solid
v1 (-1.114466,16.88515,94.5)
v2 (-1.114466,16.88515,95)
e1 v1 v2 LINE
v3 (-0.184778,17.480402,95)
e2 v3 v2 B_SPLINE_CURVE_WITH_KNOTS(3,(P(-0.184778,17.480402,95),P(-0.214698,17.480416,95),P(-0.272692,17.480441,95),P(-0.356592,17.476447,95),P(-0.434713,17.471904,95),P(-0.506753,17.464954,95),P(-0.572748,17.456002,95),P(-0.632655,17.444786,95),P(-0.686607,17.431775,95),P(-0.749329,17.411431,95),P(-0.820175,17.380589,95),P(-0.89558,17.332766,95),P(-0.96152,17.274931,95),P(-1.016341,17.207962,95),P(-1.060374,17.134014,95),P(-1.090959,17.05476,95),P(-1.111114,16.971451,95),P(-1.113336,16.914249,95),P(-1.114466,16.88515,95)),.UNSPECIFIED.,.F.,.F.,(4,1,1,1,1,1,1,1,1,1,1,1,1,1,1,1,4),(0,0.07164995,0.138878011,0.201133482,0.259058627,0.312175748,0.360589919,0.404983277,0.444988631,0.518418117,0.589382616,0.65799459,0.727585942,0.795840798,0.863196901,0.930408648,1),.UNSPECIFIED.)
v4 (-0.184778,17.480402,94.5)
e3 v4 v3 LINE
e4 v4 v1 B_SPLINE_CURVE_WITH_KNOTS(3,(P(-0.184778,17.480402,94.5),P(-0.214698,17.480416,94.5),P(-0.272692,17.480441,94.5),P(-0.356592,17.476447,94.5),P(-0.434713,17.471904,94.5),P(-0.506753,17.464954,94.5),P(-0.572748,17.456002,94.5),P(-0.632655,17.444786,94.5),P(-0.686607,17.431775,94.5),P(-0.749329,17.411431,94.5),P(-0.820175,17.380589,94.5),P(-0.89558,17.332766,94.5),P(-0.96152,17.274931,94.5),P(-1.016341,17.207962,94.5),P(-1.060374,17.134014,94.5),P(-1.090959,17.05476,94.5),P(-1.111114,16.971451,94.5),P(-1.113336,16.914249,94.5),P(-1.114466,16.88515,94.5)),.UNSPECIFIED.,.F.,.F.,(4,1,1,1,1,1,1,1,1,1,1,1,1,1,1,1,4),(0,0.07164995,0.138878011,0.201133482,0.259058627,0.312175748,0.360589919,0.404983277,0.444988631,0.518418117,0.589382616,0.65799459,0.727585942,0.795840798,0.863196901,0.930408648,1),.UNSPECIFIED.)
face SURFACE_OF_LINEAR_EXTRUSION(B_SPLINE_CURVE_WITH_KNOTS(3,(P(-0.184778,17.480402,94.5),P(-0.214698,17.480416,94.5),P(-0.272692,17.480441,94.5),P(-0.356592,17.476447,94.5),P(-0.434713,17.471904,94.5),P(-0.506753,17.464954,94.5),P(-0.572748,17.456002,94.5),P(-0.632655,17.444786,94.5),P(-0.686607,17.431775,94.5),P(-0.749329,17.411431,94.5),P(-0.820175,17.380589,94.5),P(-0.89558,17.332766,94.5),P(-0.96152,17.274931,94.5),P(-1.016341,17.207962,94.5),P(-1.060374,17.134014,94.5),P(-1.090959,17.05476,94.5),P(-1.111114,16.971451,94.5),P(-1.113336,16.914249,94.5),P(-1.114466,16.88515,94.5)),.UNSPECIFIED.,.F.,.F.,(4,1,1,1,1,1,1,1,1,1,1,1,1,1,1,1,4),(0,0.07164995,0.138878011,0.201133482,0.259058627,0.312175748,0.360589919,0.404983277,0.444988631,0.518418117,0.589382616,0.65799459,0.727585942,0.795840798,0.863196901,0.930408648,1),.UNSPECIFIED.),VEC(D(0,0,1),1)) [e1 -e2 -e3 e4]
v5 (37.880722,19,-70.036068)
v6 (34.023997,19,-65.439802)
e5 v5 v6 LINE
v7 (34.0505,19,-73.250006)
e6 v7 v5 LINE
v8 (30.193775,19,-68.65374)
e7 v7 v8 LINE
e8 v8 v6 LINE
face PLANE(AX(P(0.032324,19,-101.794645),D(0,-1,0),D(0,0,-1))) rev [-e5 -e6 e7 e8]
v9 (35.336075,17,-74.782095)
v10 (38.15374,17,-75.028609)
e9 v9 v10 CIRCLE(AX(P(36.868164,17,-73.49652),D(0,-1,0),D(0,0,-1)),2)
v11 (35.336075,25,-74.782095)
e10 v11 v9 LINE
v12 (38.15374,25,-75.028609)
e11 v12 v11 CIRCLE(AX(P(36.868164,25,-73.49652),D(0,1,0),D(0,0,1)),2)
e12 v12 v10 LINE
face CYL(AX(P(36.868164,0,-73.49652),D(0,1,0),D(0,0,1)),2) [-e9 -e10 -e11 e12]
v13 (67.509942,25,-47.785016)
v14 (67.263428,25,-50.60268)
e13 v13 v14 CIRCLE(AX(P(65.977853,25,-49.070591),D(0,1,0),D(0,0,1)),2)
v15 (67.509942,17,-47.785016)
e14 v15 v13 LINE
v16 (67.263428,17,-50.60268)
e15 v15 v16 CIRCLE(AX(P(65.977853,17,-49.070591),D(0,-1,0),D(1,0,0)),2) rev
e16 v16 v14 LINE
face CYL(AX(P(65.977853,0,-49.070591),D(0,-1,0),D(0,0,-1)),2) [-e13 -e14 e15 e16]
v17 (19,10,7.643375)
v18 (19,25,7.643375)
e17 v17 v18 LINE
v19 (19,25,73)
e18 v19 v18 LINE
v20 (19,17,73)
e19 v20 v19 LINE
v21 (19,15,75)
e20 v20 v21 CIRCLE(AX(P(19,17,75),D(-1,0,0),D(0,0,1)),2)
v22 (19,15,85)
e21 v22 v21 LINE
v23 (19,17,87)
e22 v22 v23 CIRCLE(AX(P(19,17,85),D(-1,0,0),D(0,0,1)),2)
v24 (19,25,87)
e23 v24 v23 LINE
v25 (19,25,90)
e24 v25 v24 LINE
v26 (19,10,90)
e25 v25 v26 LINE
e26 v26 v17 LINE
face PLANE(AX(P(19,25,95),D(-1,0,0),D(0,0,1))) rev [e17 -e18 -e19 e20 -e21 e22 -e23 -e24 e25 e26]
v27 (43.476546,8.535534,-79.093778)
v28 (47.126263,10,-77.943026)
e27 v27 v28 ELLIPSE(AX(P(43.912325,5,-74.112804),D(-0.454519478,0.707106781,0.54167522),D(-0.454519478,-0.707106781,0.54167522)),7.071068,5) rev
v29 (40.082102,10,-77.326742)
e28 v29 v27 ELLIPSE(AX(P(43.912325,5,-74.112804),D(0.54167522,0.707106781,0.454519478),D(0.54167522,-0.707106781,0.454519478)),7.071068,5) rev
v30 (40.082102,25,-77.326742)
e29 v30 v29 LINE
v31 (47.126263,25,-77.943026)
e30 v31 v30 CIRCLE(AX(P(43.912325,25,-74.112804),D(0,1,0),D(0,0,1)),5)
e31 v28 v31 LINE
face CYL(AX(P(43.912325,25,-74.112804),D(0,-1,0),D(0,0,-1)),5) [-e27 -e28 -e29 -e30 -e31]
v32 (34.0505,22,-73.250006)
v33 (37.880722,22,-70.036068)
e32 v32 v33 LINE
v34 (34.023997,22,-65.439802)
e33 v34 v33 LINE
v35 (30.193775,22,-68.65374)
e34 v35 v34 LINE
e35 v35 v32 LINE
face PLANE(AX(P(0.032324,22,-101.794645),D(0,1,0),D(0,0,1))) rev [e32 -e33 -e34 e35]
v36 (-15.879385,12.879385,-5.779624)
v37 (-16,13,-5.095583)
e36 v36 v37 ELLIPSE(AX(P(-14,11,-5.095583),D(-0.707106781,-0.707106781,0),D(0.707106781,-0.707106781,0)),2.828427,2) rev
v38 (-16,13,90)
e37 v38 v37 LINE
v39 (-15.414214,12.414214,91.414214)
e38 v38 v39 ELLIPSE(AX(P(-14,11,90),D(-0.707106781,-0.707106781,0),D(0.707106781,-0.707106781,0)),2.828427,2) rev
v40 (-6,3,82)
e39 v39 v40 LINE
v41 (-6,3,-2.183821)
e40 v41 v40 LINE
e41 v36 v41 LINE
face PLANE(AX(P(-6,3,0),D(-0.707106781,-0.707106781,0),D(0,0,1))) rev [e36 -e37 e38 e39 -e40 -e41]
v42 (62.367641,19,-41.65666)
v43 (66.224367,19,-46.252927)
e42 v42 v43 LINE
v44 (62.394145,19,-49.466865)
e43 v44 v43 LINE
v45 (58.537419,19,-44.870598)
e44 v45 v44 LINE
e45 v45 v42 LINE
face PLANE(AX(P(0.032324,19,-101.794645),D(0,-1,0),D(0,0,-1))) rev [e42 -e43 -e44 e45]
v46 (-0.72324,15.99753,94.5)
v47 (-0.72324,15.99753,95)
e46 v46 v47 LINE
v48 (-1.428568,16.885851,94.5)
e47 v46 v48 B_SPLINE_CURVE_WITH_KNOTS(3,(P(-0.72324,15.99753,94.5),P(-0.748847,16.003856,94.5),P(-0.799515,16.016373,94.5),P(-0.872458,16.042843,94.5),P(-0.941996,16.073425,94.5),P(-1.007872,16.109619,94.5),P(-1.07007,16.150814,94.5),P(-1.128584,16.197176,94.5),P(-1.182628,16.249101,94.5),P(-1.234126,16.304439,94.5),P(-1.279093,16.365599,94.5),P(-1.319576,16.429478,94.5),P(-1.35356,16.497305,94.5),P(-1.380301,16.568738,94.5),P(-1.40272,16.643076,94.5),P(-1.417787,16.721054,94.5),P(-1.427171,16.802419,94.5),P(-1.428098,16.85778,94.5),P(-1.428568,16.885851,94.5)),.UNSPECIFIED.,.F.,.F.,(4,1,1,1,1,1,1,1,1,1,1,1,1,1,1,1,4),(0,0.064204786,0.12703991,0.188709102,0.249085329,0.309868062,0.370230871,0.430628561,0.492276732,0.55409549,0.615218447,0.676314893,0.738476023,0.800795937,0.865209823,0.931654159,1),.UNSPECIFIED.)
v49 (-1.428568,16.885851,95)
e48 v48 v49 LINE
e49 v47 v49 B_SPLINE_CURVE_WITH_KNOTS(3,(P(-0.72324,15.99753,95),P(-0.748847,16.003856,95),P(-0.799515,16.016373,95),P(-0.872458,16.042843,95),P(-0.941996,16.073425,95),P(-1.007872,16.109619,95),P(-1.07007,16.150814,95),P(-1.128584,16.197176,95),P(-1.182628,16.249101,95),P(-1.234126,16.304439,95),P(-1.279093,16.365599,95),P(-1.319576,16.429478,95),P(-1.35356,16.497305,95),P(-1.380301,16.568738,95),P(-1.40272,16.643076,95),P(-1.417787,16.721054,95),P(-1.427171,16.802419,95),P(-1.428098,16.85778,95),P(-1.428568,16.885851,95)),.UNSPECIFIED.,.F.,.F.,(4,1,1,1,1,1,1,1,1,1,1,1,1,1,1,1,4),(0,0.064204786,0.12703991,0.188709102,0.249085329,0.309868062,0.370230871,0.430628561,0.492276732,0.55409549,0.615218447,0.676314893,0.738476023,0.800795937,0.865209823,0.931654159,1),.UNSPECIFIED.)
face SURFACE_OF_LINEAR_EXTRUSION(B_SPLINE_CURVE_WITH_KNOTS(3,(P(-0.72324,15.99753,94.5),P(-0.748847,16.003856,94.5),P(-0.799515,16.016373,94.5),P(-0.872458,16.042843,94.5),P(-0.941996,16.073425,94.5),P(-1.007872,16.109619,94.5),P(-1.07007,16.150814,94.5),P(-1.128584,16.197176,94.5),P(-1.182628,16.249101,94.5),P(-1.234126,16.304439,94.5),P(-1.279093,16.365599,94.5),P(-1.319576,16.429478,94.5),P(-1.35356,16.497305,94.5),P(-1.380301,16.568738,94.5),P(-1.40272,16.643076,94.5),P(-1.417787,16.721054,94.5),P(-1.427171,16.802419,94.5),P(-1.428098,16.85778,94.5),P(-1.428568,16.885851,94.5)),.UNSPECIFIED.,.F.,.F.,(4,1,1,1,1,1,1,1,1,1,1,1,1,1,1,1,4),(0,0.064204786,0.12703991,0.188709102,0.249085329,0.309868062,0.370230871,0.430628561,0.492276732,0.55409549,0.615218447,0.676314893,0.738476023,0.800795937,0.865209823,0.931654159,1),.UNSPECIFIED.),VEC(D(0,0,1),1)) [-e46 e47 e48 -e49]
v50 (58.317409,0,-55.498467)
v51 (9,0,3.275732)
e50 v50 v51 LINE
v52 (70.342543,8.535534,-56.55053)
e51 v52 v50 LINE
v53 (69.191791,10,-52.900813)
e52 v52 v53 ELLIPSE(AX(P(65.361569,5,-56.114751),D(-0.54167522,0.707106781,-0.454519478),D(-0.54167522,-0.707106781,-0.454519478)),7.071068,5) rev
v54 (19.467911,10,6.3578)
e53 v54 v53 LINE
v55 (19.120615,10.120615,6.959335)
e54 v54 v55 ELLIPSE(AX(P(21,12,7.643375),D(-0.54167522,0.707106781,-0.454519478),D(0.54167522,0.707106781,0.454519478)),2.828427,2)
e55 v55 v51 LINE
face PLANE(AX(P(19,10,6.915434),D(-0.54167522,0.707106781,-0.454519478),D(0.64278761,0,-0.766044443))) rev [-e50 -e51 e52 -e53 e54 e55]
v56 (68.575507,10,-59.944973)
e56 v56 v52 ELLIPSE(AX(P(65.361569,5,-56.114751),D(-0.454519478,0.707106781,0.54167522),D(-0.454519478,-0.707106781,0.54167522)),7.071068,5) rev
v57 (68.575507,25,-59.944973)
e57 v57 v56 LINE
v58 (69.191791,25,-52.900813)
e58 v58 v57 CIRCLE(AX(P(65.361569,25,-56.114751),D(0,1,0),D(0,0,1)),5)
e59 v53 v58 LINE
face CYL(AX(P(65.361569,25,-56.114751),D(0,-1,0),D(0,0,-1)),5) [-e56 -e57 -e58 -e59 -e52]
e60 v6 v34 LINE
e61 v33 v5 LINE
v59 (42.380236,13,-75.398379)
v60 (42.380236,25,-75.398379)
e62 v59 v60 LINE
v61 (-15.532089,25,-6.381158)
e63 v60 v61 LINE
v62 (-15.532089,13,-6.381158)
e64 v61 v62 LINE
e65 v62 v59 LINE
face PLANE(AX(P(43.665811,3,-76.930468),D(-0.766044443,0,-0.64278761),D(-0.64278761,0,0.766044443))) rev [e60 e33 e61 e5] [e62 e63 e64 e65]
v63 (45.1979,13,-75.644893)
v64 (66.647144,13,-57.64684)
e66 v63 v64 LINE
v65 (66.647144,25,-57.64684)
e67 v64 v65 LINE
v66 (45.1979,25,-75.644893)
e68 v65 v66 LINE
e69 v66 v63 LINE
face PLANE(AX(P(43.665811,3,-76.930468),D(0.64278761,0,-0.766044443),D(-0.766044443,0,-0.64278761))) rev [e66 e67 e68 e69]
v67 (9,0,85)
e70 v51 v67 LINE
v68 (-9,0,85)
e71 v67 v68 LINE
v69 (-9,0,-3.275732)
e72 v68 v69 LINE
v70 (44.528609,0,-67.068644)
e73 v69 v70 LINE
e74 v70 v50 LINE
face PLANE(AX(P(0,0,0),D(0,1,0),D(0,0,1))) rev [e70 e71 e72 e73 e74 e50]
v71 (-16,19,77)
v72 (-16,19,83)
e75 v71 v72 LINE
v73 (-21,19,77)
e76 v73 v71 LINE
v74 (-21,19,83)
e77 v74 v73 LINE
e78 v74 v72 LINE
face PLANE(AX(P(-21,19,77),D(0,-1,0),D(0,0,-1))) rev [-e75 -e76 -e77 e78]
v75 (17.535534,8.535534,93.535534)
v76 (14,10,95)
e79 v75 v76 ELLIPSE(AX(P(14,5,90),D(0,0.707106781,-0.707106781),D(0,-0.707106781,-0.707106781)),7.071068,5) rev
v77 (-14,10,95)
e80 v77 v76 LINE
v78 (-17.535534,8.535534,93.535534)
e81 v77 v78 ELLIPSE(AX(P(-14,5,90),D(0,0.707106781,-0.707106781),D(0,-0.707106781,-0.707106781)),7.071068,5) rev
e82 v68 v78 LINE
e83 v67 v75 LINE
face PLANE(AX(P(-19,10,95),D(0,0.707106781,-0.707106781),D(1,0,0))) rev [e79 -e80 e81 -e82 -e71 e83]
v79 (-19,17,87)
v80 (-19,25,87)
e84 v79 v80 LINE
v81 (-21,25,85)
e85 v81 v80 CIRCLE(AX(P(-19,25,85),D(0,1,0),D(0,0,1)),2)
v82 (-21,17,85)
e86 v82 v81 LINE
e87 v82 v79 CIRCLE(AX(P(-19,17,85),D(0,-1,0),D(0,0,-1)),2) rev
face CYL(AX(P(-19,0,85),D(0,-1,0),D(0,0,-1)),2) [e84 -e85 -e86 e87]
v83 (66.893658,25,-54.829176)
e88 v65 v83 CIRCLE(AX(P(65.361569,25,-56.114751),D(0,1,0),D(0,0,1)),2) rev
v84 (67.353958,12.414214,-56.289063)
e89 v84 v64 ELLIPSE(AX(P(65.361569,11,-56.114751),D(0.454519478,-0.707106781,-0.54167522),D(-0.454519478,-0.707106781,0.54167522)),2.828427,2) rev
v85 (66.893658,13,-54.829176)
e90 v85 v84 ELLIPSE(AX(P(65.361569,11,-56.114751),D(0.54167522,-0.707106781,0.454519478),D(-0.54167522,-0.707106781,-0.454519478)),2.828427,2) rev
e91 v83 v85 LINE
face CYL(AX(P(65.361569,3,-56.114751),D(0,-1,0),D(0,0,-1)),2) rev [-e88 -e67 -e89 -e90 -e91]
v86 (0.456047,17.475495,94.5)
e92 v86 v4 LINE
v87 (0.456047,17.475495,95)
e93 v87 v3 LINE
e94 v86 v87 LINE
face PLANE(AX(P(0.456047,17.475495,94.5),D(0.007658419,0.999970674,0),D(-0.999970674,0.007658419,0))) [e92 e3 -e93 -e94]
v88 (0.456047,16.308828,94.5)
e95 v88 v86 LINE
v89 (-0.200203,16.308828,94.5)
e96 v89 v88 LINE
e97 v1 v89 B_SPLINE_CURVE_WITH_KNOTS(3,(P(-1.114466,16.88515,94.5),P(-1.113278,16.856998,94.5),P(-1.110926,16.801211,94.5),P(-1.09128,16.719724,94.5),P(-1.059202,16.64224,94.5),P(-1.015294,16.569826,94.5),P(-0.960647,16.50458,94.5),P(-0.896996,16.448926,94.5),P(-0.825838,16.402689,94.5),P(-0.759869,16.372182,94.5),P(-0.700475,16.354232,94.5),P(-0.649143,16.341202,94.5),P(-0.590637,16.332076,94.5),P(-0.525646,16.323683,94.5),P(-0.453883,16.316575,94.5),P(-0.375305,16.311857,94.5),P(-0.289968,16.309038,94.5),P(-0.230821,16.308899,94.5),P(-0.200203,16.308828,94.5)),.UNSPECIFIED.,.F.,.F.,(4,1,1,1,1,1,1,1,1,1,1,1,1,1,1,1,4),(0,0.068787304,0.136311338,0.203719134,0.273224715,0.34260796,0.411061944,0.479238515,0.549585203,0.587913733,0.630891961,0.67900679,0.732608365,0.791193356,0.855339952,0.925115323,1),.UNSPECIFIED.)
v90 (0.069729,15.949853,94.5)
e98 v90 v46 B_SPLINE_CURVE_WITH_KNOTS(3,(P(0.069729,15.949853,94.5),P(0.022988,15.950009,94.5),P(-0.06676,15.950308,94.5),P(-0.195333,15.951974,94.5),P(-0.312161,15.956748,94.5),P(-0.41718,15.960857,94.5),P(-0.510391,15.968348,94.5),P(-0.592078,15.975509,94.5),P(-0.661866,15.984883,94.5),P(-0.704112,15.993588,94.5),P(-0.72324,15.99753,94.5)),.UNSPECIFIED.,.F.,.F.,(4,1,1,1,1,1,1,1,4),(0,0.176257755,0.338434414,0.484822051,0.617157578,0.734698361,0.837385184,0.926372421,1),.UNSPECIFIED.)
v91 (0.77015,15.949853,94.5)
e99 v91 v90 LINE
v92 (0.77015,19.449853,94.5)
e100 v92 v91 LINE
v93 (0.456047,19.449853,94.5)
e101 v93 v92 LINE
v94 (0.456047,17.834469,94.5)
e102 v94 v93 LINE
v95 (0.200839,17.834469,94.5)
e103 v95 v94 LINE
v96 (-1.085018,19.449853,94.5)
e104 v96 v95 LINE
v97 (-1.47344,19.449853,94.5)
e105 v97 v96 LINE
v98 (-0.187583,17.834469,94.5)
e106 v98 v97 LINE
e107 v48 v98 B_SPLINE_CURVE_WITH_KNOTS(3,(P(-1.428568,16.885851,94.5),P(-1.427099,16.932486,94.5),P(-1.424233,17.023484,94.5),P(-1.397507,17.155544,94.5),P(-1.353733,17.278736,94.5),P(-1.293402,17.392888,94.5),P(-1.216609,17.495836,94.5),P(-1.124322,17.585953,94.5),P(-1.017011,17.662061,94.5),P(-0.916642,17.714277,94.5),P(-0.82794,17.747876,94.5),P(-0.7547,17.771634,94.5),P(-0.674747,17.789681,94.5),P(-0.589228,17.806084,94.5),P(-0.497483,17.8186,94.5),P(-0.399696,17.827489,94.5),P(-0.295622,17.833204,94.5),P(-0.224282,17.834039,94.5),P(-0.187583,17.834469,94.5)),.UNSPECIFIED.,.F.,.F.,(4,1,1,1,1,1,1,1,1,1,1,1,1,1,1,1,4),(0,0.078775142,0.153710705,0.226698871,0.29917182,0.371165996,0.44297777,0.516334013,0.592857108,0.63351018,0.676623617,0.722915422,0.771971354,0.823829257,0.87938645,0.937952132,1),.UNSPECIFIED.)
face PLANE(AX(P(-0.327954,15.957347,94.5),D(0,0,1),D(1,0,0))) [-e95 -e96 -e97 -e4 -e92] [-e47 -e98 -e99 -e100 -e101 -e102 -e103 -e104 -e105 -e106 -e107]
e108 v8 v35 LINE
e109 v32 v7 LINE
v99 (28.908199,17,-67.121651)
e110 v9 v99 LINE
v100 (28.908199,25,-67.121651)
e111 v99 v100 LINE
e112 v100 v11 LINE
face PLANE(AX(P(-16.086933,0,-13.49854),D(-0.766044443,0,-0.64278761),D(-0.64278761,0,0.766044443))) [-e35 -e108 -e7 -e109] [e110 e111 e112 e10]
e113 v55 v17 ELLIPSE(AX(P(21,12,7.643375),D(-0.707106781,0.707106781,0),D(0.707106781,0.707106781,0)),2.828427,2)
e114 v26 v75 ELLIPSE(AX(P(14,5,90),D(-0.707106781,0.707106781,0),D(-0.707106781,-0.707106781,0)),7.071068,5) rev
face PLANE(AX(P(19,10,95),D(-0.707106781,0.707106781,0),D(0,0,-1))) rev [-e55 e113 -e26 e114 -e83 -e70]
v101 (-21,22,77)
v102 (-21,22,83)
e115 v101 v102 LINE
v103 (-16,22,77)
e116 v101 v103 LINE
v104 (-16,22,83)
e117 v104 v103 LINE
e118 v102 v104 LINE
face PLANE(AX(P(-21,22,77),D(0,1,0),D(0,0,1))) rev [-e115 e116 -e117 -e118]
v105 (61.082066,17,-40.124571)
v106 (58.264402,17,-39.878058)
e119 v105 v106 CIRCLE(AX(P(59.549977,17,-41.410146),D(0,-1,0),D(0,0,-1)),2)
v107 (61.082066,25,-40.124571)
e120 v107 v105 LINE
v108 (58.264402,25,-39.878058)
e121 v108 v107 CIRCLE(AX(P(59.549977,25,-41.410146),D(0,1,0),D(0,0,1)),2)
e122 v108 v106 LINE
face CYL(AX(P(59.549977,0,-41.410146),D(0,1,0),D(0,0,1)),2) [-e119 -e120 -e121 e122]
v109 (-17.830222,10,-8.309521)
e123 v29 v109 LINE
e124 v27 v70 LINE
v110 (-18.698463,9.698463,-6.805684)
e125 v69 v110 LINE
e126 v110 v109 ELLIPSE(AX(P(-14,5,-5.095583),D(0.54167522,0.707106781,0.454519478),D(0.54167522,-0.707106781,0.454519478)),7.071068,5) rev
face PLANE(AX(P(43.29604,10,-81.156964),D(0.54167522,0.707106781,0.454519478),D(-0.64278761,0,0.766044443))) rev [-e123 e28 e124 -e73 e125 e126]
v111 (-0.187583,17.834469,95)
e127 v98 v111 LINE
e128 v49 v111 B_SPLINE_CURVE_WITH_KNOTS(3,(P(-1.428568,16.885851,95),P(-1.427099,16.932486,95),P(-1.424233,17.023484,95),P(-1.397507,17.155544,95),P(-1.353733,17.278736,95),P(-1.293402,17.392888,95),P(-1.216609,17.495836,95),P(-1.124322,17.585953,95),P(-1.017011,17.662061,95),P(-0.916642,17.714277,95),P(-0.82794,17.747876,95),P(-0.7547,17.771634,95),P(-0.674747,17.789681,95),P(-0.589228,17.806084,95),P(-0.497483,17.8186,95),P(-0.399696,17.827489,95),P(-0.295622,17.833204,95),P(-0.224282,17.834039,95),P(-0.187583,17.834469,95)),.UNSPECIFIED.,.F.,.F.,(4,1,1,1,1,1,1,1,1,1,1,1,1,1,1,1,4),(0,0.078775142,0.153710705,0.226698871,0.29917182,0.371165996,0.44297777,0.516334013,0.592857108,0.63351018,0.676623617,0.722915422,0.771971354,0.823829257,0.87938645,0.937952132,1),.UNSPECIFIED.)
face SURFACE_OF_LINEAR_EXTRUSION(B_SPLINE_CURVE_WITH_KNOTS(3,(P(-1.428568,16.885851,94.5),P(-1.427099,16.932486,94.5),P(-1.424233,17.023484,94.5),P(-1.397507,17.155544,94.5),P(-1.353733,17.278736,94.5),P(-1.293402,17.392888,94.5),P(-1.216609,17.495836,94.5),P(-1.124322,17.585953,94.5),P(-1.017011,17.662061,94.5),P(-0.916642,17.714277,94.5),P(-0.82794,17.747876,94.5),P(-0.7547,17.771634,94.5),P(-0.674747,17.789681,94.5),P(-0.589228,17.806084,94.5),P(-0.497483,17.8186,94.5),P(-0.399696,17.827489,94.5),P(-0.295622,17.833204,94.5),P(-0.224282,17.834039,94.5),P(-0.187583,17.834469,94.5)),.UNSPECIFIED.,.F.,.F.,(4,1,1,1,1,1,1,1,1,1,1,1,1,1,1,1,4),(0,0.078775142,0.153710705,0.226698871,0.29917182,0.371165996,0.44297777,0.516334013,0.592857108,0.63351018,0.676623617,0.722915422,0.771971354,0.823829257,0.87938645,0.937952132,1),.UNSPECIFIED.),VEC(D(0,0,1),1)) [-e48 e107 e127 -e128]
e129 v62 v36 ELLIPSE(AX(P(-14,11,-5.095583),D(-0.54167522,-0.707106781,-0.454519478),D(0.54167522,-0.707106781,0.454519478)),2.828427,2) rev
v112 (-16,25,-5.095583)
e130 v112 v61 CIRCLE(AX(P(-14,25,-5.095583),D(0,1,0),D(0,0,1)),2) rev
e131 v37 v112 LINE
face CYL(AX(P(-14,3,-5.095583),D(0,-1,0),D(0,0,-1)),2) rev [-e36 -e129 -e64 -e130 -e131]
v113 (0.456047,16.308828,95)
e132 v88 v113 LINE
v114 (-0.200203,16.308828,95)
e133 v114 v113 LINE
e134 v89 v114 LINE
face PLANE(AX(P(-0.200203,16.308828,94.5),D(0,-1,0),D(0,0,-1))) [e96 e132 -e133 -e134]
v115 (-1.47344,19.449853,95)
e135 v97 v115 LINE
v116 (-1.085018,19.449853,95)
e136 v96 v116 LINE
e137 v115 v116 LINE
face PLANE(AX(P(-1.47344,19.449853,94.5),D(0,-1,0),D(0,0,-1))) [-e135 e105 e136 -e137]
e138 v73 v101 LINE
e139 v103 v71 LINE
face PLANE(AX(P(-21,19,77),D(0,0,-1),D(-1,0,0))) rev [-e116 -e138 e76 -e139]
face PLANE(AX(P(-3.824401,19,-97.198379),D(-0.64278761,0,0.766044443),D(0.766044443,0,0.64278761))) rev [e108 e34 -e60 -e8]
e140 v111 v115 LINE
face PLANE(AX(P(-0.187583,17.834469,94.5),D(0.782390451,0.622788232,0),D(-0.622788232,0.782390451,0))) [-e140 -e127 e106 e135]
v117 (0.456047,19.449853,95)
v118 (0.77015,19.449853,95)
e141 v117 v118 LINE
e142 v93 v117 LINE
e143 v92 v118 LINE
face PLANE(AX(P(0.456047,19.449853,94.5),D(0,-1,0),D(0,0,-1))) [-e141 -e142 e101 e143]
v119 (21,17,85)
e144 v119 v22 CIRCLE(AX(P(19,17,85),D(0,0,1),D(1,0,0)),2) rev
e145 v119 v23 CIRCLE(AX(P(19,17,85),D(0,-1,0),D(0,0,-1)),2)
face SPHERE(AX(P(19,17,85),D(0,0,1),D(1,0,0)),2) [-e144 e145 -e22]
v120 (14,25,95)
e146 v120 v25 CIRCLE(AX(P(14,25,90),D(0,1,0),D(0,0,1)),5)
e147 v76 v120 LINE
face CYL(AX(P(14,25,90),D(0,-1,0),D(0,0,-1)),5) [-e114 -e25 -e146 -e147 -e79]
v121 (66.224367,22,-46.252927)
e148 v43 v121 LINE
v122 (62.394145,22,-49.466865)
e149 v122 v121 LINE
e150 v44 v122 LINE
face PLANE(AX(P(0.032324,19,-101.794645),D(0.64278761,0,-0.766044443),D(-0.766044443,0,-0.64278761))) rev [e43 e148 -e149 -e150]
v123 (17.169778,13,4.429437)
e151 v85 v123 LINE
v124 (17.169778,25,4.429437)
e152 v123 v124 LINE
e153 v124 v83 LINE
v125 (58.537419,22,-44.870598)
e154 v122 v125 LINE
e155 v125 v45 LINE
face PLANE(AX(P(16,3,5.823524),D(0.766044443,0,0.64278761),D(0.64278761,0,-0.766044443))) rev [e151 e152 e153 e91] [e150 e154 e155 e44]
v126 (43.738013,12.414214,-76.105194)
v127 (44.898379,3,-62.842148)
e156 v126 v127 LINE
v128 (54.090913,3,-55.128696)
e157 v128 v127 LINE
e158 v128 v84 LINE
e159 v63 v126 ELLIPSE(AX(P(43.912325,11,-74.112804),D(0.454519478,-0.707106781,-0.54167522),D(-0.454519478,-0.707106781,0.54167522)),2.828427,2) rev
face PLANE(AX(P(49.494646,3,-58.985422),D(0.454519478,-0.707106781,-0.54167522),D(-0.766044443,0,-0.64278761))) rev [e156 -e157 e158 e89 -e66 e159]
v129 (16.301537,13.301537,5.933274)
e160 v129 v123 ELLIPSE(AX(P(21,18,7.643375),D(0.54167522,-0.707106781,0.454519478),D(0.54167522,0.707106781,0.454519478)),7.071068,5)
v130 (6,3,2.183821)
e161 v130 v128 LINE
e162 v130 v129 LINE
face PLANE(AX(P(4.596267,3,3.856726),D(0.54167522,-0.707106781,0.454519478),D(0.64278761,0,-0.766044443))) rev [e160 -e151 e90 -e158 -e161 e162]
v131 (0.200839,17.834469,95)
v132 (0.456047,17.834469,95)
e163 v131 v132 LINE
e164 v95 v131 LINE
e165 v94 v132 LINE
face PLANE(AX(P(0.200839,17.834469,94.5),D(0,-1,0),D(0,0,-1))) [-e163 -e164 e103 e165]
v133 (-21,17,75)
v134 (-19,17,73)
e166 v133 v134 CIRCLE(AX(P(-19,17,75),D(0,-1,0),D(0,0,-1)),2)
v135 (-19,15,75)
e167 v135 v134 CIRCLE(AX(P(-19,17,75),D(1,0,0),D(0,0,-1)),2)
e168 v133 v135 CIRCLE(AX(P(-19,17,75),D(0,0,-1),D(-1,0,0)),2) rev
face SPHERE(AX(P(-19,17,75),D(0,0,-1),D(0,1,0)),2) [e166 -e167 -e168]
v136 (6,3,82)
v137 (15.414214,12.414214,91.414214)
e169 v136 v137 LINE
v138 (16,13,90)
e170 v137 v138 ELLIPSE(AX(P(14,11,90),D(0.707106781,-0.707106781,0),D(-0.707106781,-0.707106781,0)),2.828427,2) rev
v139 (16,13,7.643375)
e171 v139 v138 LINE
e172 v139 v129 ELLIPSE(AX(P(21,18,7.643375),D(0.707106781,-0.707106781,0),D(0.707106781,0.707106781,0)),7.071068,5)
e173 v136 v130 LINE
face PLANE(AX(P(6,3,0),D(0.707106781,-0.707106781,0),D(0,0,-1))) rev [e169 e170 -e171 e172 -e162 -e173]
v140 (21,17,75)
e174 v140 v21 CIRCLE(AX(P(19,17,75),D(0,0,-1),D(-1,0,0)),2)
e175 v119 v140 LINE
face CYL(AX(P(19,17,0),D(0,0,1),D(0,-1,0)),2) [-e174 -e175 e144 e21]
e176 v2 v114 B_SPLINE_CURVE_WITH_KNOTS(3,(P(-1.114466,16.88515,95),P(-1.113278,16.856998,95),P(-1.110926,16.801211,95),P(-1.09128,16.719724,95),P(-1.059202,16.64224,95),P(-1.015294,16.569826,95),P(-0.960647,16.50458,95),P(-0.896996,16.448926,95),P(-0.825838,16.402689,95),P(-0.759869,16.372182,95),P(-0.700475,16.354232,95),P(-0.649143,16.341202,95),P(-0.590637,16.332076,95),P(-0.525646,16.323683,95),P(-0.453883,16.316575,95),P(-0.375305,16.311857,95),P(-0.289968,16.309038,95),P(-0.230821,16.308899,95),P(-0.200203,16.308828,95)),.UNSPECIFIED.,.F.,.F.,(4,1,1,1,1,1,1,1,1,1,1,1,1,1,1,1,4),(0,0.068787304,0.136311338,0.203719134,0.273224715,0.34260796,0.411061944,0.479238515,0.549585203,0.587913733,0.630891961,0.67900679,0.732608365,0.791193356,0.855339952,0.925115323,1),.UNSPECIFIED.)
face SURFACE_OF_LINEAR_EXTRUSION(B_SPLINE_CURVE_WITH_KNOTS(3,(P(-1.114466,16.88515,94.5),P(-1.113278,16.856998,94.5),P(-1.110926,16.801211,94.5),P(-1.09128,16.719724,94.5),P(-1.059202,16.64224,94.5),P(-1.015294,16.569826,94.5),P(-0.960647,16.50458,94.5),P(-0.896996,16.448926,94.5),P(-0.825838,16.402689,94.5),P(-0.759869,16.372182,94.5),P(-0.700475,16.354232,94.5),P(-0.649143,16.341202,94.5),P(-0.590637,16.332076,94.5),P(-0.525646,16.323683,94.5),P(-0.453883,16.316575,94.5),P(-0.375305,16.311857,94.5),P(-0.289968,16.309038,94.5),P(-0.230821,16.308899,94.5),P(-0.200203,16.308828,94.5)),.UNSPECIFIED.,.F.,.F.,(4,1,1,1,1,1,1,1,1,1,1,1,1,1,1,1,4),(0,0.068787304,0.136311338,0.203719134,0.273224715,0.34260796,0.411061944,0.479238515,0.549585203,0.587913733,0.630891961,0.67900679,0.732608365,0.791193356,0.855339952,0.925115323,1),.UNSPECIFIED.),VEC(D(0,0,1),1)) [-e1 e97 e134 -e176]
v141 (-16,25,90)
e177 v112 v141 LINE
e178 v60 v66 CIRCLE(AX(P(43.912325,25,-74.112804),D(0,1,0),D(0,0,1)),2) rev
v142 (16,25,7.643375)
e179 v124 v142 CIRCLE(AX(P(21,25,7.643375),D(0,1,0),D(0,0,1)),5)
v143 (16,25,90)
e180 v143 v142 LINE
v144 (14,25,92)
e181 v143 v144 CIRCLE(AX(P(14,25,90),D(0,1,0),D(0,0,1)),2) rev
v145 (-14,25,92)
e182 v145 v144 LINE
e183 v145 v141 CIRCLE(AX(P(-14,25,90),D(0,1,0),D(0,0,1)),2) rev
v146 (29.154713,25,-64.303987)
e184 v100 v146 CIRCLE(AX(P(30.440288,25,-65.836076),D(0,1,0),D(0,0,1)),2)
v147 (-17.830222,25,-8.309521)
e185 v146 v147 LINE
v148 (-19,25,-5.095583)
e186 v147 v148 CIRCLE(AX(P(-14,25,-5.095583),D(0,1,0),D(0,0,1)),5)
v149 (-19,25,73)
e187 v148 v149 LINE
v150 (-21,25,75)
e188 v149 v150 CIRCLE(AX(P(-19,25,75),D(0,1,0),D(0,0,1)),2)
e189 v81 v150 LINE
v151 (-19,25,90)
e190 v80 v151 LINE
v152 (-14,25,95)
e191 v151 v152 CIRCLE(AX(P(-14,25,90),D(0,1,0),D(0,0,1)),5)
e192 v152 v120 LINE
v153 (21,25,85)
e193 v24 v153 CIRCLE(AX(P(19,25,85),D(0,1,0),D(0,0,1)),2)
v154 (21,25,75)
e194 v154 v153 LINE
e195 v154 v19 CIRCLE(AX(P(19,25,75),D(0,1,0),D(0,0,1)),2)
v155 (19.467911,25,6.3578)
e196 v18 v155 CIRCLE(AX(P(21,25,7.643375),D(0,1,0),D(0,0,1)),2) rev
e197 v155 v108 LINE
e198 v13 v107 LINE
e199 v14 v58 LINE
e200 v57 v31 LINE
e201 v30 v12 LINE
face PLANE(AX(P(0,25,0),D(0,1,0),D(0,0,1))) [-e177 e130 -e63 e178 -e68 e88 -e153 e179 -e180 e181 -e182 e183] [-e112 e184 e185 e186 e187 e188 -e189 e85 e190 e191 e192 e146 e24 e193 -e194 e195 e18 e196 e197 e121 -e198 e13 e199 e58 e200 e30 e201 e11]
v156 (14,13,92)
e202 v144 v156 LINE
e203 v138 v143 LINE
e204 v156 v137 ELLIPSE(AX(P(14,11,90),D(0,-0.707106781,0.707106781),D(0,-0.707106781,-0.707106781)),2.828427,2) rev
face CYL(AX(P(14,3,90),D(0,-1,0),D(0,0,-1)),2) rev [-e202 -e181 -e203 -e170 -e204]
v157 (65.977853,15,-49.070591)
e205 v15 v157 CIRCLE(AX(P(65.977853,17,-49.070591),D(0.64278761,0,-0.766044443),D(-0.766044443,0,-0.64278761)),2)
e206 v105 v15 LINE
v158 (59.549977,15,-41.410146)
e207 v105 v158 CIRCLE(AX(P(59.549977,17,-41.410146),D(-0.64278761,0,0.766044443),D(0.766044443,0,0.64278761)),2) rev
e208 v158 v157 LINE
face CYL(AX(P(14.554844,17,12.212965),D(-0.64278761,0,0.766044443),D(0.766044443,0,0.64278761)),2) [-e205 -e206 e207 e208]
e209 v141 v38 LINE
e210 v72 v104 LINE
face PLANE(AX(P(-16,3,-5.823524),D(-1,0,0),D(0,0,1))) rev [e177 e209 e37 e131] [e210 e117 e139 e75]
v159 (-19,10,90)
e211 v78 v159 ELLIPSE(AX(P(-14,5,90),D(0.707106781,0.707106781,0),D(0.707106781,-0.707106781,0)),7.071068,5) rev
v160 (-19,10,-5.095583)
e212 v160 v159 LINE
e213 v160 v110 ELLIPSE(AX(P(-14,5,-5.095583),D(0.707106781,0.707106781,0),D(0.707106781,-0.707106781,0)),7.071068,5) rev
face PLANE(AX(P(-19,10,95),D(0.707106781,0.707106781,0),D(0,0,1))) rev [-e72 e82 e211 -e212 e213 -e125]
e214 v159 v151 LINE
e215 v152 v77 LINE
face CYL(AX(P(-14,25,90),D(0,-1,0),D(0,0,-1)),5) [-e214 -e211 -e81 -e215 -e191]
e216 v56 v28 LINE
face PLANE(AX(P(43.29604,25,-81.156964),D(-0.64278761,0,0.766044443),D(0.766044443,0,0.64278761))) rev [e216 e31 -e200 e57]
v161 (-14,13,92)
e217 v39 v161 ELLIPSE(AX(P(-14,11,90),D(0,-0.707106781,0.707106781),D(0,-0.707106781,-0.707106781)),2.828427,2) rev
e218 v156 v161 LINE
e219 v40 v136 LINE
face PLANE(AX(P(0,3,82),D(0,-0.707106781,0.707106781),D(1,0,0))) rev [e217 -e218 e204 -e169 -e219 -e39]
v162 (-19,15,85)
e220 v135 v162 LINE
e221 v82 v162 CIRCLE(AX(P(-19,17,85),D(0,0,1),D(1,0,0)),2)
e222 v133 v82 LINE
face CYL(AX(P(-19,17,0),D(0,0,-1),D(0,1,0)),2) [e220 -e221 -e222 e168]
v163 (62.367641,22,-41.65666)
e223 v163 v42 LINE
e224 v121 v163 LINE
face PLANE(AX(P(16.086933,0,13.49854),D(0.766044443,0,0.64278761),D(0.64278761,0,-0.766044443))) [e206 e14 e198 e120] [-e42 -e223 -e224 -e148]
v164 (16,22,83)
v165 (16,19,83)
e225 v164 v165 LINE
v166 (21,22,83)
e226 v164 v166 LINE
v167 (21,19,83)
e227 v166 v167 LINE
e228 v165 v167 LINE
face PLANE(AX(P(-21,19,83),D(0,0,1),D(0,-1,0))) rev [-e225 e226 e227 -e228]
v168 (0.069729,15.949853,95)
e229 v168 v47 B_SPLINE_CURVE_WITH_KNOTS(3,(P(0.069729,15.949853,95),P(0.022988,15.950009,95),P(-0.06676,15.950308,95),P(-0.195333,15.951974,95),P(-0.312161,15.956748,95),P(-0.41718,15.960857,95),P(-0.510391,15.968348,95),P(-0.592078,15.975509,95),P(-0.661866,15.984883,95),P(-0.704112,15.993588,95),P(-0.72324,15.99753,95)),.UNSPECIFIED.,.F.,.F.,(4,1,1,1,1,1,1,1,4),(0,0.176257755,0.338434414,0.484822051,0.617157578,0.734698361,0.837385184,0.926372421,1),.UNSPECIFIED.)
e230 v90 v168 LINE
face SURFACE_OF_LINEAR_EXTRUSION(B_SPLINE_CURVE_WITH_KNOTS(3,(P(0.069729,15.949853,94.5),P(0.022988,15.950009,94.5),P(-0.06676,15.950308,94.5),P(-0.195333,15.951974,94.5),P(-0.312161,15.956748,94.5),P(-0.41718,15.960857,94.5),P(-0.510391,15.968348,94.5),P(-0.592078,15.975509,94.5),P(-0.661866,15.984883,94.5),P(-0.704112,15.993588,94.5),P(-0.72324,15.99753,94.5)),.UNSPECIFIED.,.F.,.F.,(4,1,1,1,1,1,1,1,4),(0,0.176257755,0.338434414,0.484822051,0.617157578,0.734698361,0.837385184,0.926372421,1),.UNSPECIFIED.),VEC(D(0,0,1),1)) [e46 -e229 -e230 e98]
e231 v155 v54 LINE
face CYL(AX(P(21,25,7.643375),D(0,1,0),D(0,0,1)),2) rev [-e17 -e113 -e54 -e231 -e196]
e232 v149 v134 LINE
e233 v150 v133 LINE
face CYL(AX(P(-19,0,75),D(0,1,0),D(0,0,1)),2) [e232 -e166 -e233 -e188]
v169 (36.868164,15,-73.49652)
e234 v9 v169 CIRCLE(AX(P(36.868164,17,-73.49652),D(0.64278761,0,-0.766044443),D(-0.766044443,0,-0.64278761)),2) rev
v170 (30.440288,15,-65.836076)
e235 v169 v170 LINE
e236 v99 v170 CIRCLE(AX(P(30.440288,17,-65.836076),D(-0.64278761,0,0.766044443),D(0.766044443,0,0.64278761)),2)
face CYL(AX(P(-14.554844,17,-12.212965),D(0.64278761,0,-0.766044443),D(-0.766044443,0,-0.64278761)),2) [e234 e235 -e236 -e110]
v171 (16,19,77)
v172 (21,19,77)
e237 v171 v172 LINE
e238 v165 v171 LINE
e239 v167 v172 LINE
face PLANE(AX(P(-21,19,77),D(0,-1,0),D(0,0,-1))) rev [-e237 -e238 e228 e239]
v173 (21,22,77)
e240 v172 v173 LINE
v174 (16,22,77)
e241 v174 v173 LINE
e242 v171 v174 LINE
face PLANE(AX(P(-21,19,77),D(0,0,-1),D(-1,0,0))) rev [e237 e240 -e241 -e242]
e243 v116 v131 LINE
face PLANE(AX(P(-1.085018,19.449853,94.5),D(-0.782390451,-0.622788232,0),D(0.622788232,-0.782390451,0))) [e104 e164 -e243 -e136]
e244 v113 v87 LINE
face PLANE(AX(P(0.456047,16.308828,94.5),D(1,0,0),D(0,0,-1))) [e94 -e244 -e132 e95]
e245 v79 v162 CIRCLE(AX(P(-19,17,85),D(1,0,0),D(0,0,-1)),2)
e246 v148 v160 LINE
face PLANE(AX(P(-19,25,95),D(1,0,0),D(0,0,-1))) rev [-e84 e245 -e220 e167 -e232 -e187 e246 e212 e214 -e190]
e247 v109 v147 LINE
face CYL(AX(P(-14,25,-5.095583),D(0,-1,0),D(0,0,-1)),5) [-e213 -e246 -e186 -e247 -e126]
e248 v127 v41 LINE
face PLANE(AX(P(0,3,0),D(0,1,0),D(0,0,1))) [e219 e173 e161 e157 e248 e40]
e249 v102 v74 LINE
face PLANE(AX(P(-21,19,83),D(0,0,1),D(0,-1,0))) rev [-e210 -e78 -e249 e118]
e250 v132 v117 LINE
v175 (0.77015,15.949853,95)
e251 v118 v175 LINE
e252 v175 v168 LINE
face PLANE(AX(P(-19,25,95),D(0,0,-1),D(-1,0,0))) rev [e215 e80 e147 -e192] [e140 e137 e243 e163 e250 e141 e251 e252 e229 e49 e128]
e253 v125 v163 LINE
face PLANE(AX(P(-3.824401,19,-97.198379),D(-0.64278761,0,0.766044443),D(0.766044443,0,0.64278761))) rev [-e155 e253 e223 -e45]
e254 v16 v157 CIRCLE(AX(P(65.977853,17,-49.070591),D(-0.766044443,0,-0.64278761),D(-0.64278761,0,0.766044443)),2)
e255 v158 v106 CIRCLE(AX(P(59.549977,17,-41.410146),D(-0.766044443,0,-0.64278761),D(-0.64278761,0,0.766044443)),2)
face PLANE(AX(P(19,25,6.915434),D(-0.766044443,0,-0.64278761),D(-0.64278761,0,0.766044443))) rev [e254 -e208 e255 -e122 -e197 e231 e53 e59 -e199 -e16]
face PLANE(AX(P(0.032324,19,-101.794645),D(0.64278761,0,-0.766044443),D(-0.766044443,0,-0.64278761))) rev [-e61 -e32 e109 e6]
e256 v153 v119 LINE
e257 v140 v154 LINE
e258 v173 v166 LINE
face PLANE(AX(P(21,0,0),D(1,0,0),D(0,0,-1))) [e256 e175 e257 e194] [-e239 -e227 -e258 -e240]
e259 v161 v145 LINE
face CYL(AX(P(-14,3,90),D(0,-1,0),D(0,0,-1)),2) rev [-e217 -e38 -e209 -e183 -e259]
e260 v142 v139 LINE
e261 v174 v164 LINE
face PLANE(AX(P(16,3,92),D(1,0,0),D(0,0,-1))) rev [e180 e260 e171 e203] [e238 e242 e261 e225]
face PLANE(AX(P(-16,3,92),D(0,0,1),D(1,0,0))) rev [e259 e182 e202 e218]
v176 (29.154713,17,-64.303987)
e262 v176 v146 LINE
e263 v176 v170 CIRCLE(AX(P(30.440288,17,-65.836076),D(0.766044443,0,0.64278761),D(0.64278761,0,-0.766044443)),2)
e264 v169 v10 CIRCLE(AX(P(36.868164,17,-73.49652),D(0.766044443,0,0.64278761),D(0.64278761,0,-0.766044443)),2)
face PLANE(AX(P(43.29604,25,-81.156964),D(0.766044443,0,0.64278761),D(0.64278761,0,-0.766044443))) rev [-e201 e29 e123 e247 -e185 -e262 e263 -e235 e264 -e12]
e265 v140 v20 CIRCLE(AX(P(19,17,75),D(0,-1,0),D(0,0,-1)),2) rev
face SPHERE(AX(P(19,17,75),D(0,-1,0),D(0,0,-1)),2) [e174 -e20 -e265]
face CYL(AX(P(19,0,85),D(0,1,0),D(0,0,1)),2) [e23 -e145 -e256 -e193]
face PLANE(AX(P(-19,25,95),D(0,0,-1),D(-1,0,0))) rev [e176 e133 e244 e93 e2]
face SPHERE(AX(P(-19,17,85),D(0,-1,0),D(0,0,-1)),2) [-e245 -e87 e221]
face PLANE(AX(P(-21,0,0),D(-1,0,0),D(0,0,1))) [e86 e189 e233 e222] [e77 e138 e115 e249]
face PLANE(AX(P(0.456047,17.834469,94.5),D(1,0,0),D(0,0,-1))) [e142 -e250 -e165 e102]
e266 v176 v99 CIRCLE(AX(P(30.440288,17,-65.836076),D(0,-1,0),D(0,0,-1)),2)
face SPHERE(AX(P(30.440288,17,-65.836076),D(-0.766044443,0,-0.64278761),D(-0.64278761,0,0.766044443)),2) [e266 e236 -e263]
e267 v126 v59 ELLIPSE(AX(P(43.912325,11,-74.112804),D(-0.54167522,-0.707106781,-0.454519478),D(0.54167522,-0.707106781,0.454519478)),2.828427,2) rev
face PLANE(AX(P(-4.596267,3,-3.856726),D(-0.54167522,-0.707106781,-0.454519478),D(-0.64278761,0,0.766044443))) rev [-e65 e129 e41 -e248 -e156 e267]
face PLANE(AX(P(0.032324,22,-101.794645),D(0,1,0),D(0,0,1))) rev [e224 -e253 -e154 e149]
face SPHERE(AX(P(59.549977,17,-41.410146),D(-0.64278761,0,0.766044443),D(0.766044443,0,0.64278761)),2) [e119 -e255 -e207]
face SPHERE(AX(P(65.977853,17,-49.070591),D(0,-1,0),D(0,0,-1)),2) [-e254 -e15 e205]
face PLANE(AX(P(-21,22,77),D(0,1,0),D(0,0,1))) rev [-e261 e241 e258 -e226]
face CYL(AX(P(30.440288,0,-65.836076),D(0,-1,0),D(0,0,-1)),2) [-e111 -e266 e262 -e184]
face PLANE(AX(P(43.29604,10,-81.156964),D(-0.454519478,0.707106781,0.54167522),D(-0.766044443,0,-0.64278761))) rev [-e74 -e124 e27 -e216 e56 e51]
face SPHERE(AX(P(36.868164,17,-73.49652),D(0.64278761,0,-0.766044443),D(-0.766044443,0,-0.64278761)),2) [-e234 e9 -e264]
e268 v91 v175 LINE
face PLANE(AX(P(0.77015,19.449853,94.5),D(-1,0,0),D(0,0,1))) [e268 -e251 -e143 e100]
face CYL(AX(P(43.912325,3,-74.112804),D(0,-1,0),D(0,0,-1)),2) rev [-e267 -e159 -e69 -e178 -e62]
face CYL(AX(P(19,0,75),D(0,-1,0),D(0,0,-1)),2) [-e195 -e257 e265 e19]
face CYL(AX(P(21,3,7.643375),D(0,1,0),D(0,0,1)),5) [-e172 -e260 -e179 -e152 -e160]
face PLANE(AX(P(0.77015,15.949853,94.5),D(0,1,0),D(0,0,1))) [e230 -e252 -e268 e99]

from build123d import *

# Parameters (mm, degrees)
BOSS_EXTRUDE1_DEPTH     = 25
CUT_EXTRUDE1_DEPTH      = 22
CHAMFER1_SIZE           = 10
FILLET1_R               = 2
FILLET2_R               = 5
SKETCH3_W               = 14
SKETCH3_H               = 10
BOSS_EXTRUDE2_DEPTH     = 2
SKETCH4_W               = 14
SKETCH4_H               = 10
BOSS_EXTRUDE3_DEPTH     = 2
CUT_EXTRUDE2_DEPTH      = 111.216138206
CUT_EXTRUDE2_DEPTH_BACK = 111.216138206
SKETCH5_W               = 6
SKETCH5_H               = 3
SKETCH6_W               = 14
SKETCH6_H               = 10
BOSS_EXTRUDE4_DEPTH     = 2
SKETCH7_W               = 14
SKETCH7_H               = 10
BOSS_EXTRUDE5_DEPTH     = 2
CUT_EXTRUDE3_DEPTH      = 110.938912569
CUT_EXTRUDE3_DEPTH_BACK = 110.938912569
SKETCH8_W               = 6
SKETCH8_H               = 3
FILLET4_R               = 2
CUT_EXTRUDE4_DEPTH      = 0.5


with BuildPart() as part:
    # Sketch1 → Boss-Extrude1 (new body)
    with BuildSketch(Plane(origin=(0, 0, 0), x_dir=(1, 0, 0), z_dir=(0, 1, 0))):
        Polygon((19, -95), (19, -6.915434451), (72.405729291, 56.731035297), (43.296040453, 81.156964465), (-19, 6.915434451), (-19, -95), align=None)
    extrude(amount=BOSS_EXTRUDE1_DEPTH)

    # Sketch2 → Cut-Extrude1 (cut)
    with BuildSketch(Plane(origin=(0, 25, 0), x_dir=(1, 0, 0), z_dir=(0, 1, 0))):
        Polygon((43.665810953, 76.930468306), (68.179233133, 56.361264796), (16, -5.823523748), (16, -92), (-16, -92), (-16, 5.823523748), align=None)
    extrude(amount=-CUT_EXTRUDE1_DEPTH, mode=Mode.SUBTRACT)

    # Chamfer1
    chamfer1_edges = [part.edges().sort_by_distance(p)[0] for p in [
        (13.832905476, 3, -41.376996027),
        (55.922522043, 3, -66.645866551),
        (42.089616566, 3, -25.268870524),
        (16, 3, 48.911761874),
        (0, 3, 92),
        (-16, 3, 43.088238126),
        (-19, 0, 44.042282774),
        (12.148020226, 0, -44.036199458),
        (57.850884872, 0, -68.943999881),
        (45.702864646, 0, -24.907800423),
        (19, 0, 50.957717226),
        (0, 0, 95),
    ]]
    chamfer(chamfer1_edges, length=CHAMFER1_SIZE)

    # Fillet1
    fillet1_edges = [part.edges().sort_by_distance(p)[0] for p in [
        (19, 17.5, 6.915434451),
        (43.665810953, 19, -76.930468306),
        (68.179233133, 19, -56.361264796),
        (16, 19, 92),
        (-16, 19, 92),
        (-16, 19, -5.823523748),
    ]]
    fillet(fillet1_edges, radius=FILLET1_R)

    # Fillet2
    fillet2_edges = [part.edges().sort_by_distance(p)[0] for p in [
        (-19, 17.5, 95),
        (-19, 17.5, -6.915434451),
        (43.296040453, 17.5, -81.156964465),
        (72.405729291, 17.5, -56.731035297),
        (19, 17.5, 95),
        (16, 19, 5.823523748),
    ]]
    fillet(fillet2_edges, radius=FILLET2_R)

    # Sketch3 → Boss-Extrude2 (add)
    with BuildSketch(Plane(origin=(-14.554844419, 0, -12.212964584), x_dir=(-0.6427876096865406, 0, 0.7660444431189771), z_dir=(-0.766044443118977, 0, -0.6427876096865405))):
        with Locations((-75, 20)):
            Rectangle(SKETCH3_W, SKETCH3_H)
    extrude(amount=BOSS_EXTRUDE2_DEPTH)

    # Sketch4 → Boss-Extrude3 (add)
    with BuildSketch(Plane(origin=(14.554844419, 0, 12.212964584), x_dir=(0.6427876096865404, 0, -0.7660444431189771), z_dir=(0.7660444431189771, 0, 0.6427876096865404))):
        with Locations((75, 20)):
            Rectangle(SKETCH4_W, SKETCH4_H)
    extrude(amount=BOSS_EXTRUDE3_DEPTH)

    # Sketch5 → Cut-Extrude2 (cut, two sides: drawn at the far end of the back side and taken through both)
    with BuildSketch(Plane(origin=(16.086933305, 0, 13.498539803), x_dir=(0.64278760968654, 0, -0.7660444431189776), z_dir=(0.7660444431189775, 0, 0.6427876096865399)).offset(-CUT_EXTRUDE2_DEPTH_BACK)):
        with Locations((75, 20.5)):
            Rectangle(SKETCH5_W, SKETCH5_H)
    extrude(amount=CUT_EXTRUDE2_DEPTH + CUT_EXTRUDE2_DEPTH_BACK, mode=Mode.SUBTRACT)

    # Sketch6 → Boss-Extrude4 (add)
    with BuildSketch(Plane.ZY.offset(19)):
        with Locations((80, 20)):
            Rectangle(SKETCH6_W, SKETCH6_H)
    extrude(amount=BOSS_EXTRUDE4_DEPTH)

    # Sketch7 → Boss-Extrude5 (add)
    with BuildSketch(Plane(origin=(19, 0, 0), x_dir=(0, 0, -1), z_dir=(1, 0, 0))):
        with Locations((-80, 20)):
            Rectangle(SKETCH7_W, SKETCH7_H)
    extrude(amount=BOSS_EXTRUDE5_DEPTH)

    # Sketch8 → Cut-Extrude3 (cut, two sides: drawn at the far end of the back side and taken through both)
    with BuildSketch(Plane(origin=(21, 0, 0), x_dir=(0, 0, -1), z_dir=(1, 0, 0)).offset(-CUT_EXTRUDE3_DEPTH_BACK)):
        with Locations((-80, 20.5)):
            Rectangle(SKETCH8_W, SKETCH8_H)
    extrude(amount=CUT_EXTRUDE3_DEPTH + CUT_EXTRUDE3_DEPTH_BACK, mode=Mode.SUBTRACT)

    # Fillet4
    # the kernel refuses this fillet: 2 mm, written as the material it takes off along each edge
    with BuildSketch(Plane(origin=(36.868164356, 17, -73.496520034), x_dir=(-0.7660444431189771, 0, -0.6427876096865406), z_dir=(0.6427876096865406, 0, -0.7660444431189771))) as fillet4_piece_1_section:
        Polygon((0, 0), (FILLET4_R * 1.02, 0), (FILLET4_R * 1.02, -FILLET4_R * 1.02), (0, -FILLET4_R * 1.02), align=None)
    fillet4_piece_1 = extrude(amount=FILLET4_R * 1.02, mode=Mode.PRIVATE)
    fillet4_piece_1 = fillet4_piece_1 - Plane(origin=(36.868164356, 17, -73.496520034), x_dir=(0.5416752204197013, 0.7071067811865475, 0.4545194776720445), z_dir=(0.6427876096865406, 0, -0.7660444431189771)) * Sphere(FILLET4_R, mode=Mode.PRIVATE)
    add(fillet4_piece_1, mode=Mode.SUBTRACT)
    with BuildSketch(Plane(origin=(30.440288259, 17, -65.836075602), x_dir=(-0.7660444431189771, 0, -0.6427876096865406), z_dir=(0, -1, 0))) as fillet4_piece_2_section:
        Polygon((0, 0), (FILLET4_R * 1.02, 0), (FILLET4_R * 1.02, -FILLET4_R * 1.02), (0, -FILLET4_R * 1.02), align=None)
    fillet4_piece_2 = extrude(amount=FILLET4_R * 1.02, mode=Mode.PRIVATE)
    fillet4_piece_2 = fillet4_piece_2 - Plane(origin=(30.440288259, 17, -65.836075602), x_dir=(0.9961946980917457, -1.0048591735576166e-15, -0.08715574274765664), z_dir=(0, -1, 0)) * Sphere(FILLET4_R, mode=Mode.PRIVATE)
    add(fillet4_piece_2, mode=Mode.SUBTRACT)
    with BuildSketch(Plane(origin=(59.549977097, 17, -41.410146434), x_dir=(-0.6427876096865404, 0, 0.7660444431189771), z_dir=(0, -1, 0))) as fillet4_piece_3_section:
        Polygon((0, 0), (FILLET4_R * 1.02, 0), (FILLET4_R * 1.02, -FILLET4_R * 1.02), (0, -FILLET4_R * 1.02), align=None)
    fillet4_piece_3 = extrude(amount=FILLET4_R * 1.02, mode=Mode.PRIVATE)
    fillet4_piece_3 = fillet4_piece_3 - Plane(origin=(59.549977097, 17, -41.410146434), x_dir=(-0.08715574274765679, 0, -0.9961946980917457), z_dir=(0, -1, 0)) * Sphere(FILLET4_R, mode=Mode.PRIVATE)
    add(fillet4_piece_3, mode=Mode.SUBTRACT)
    with BuildSketch(Plane(origin=(65.977853194, 17, -49.070590865), x_dir=(0.7660444431189771, 0, 0.6427876096865404), z_dir=(0, -1, 0))) as fillet4_piece_4_section:
        Polygon((0, 0), (FILLET4_R * 1.02, 0), (FILLET4_R * 1.02, -FILLET4_R * 1.02), (0, -FILLET4_R * 1.02), align=None)
    fillet4_piece_4 = extrude(amount=FILLET4_R * 1.02, mode=Mode.PRIVATE)
    fillet4_piece_4 = fillet4_piece_4 - Plane(origin=(65.977853194, 17, -49.070590865), x_dir=(-0.9961946980917457, 0, 0.08715574274765679), z_dir=(0, -1, 0)) * Sphere(FILLET4_R, mode=Mode.PRIVATE)
    add(fillet4_piece_4, mode=Mode.SUBTRACT)
    with BuildSketch(Plane(origin=(-19, 17, 75), x_dir=(-1, 0, 0), z_dir=(0, 0, -1))) as fillet4_piece_5_section:
        Polygon((0, 0), (FILLET4_R * 1.02, 0), (FILLET4_R * 1.02, -FILLET4_R * 1.02), (0, -FILLET4_R * 1.02), align=None)
    fillet4_piece_5 = extrude(amount=FILLET4_R * 1.02, mode=Mode.PRIVATE)
    fillet4_piece_5 = fillet4_piece_5 - Plane(origin=(-19, 17, 75), x_dir=(0.7071067811865475, 0.7071067811865475, 0), z_dir=(0, 0, -1)) * Sphere(FILLET4_R, mode=Mode.PRIVATE)
    add(fillet4_piece_5, mode=Mode.SUBTRACT)
    with BuildSketch(Plane(origin=(-19, 17, 85), x_dir=(-1, 0, 0), z_dir=(0, -1, 0))) as fillet4_piece_6_section:
        Polygon((0, 0), (FILLET4_R * 1.02, 0), (FILLET4_R * 1.02, -FILLET4_R * 1.02), (0, -FILLET4_R * 1.02), align=None)
    fillet4_piece_6 = extrude(amount=FILLET4_R * 1.02, mode=Mode.PRIVATE)
    fillet4_piece_6 = fillet4_piece_6 - Plane(origin=(-19, 17, 85), x_dir=(0.7071067811865475, 0, -0.7071067811865475), z_dir=(0, -1, 0)) * Sphere(FILLET4_R, mode=Mode.PRIVATE)
    add(fillet4_piece_6, mode=Mode.SUBTRACT)
    with BuildSketch(Plane(origin=(19, 17, 85), x_dir=(0, -1, 0), z_dir=(1, 0, 0))) as fillet4_piece_7_section:
        Polygon((0, 0), (FILLET4_R * 1.02, 0), (FILLET4_R * 1.02, -FILLET4_R * 1.02), (0, -FILLET4_R * 1.02), align=None)
    fillet4_piece_7 = extrude(amount=FILLET4_R * 1.02, mode=Mode.PRIVATE)
    fillet4_piece_7 = fillet4_piece_7 - Plane(origin=(19, 17, 85), x_dir=(0, 0.7071067811865476, -0.7071067811865475), z_dir=(1, 0, 0)) * Sphere(FILLET4_R, mode=Mode.PRIVATE)
    add(fillet4_piece_7, mode=Mode.SUBTRACT)
    with BuildSketch(Plane(origin=(19, 17, 75), x_dir=(0, 0, -1), z_dir=(1, 0, 0))) as fillet4_piece_8_section:
        Polygon((0, 0), (FILLET4_R * 1.02, 0), (FILLET4_R * 1.02, -FILLET4_R * 1.02), (0, -FILLET4_R * 1.02), align=None)
    fillet4_piece_8 = extrude(amount=FILLET4_R * 1.02, mode=Mode.PRIVATE)
    fillet4_piece_8 = fillet4_piece_8 - Plane(origin=(19, 17, 75), x_dir=(0, 0.7071067811865475, 0.7071067811865477), z_dir=(1, 0, 0)) * Sphere(FILLET4_R, mode=Mode.PRIVATE)
    add(fillet4_piece_8, mode=Mode.SUBTRACT)
    with BuildSketch(Plane(origin=(36.621650689, 17, -76.314184139), x_dir=(0.7660444431189815, 0, 0.6427876096865355), z_dir=(0, 1, 0)), Plane(origin=(59.796490764, 17, -38.592482329), x_dir=(-0.7660444431189785, 0, -0.6427876096865388), z_dir=(0, 1, 0)), Plane(origin=(-21, 17, 73), x_dir=(1, 0, 0), z_dir=(0, 1, 0)), Plane(origin=(21, 17, 87), x_dir=(-1, 0, 0), z_dir=(0, 1, 0)), Plane(origin=(21, 30, 73), x_dir=(-1, 0, 0), z_dir=(0, -1, 0))) as fillet4_piece_9:
        with BuildLine():
            CenterArc((FILLET4_R, -FILLET4_R), FILLET4_R, 90, 90)
            Line((0, -FILLET4_R), (0, 0))
            Line((0, 0), (FILLET4_R, 0))
        make_face()
    extrude(amount=13, mode=Mode.SUBTRACT)
    with BuildSketch(Plane(origin=(28.908199373, 15, -67.121650822), x_dir=(0, 1, 0), z_dir=(0.6427876096865406, 0, -0.7660444431189771)), Plane(origin=(67.50994208, 15, -47.785015646), x_dir=(0, 1, 0), z_dir=(-0.6427876096865404, 0, 0.7660444431189771)), Plane(origin=(-21, 15, 85), x_dir=(0, 1, 0), z_dir=(0, 0, -1))) as fillet4_piece_10:
        with BuildLine():
            CenterArc((FILLET4_R, FILLET4_R), FILLET4_R, 180, 90)
            Line((0, FILLET4_R), (0, 0))
            Line((0, 0), (FILLET4_R, 0))
        make_face()
    extrude(amount=10, mode=Mode.SUBTRACT)
    with BuildSketch(Plane(origin=(27.622624153, 30, -65.589561936), x_dir=(0.6427876096865434, -1.4210854715202012e-15, -0.7660444431189747), z_dir=(0, -1, 0)), Plane(origin=(68.7955173, 30, -49.317104532), x_dir=(-0.6427876096865396, 0, 0.7660444431189779), z_dir=(0, -1, 0)), Plane(origin=(-21, 30, 87), x_dir=(0, 0, -1), z_dir=(0, -1, 0))) as fillet4_piece_11:
        with BuildLine():
            CenterArc((FILLET4_R, FILLET4_R), FILLET4_R, 180, 90)
            Line((0, FILLET4_R), (0, 0))
            Line((0, 0), (FILLET4_R, 0))
        make_face()
    extrude(amount=13, mode=Mode.SUBTRACT)
    with BuildSketch(Plane(origin=(21, 15, 75), x_dir=(-1, 0, 0), z_dir=(0, 0, 1))) as fillet4_piece_12:
        with BuildLine():
            CenterArc((FILLET4_R, -FILLET4_R), FILLET4_R, 90, 90)
            Line((0, -FILLET4_R), (0, 0))
            Line((0, 0), (FILLET4_R, 0))
        make_face()
    extrude(amount=10, mode=Mode.SUBTRACT)

    # Sketch9 → Cut-Extrude4 (cut)
    with BuildSketch(Plane.XY.offset(95)):
        with BuildLine():
            Line((0.770149808, 15.949853493), (0.069729135, 15.949853493))
            add(Edge.make_bspline(
                [(0.069729135, 15.949853493), (0.022988006, 15.950009079), (-0.066760138, 15.950307821), (-0.195333409, 15.951973584), (-0.312160506, 15.95674794), (-0.417180345, 15.960856524), (-0.510391, 15.968348465), (-0.592078291, 15.975509112), (-0.661865988, 15.984882773), (-0.704111839, 15.993588196), (-0.723239615, 15.997529775)],
                knots=[0, 0, 0, 0, 1.410062039, 2.707475311, 3.878576406, 4.937260626, 5.877586885, 6.699081471, 7.410979367, 8, 8, 8, 8], degree=3))
            add(Edge.make_bspline(
                [(-0.723239615, 15.997529775), (-0.748846671, 16.00385584), (-0.799514513, 16.016373018), (-0.872458324, 16.042842782), (-0.941995725, 16.07342491), (-1.007872068, 16.109619108), (-1.07007009, 16.150814191), (-1.128583525, 16.197175766), (-1.182627824, 16.249101056), (-1.234125799, 16.304439111), (-1.279093367, 16.365599283), (-1.319576108, 16.429477854), (-1.353559982, 16.497304646), (-1.380301499, 16.568737557), (-1.402719695, 16.643075866), (-1.417786816, 16.721054136), (-1.427170882, 16.802418665), (-1.428098028, 16.857779951), (-1.428568141, 16.885851089)],
                knots=[0, 0, 0, 0, 1.027276577, 2.032638556, 3.019345632, 3.985365262, 4.957888996, 5.923693931, 6.890056973, 7.876427719, 8.865527834, 9.843495157, 10.821038291, 11.815616373, 12.812734995, 13.843357168, 14.906466538, 16, 16, 16, 16], degree=3))
            add(Edge.make_bspline(
                [(-1.428568141, 16.885851089), (-1.427099181, 16.932486248), (-1.42423286, 17.02348352), (-1.397507223, 17.155543652), (-1.353732651, 17.278735708), (-1.293402188, 17.392888247), (-1.216609264, 17.495836267), (-1.124321632, 17.585953039), (-1.017010598, 17.662060759), (-0.916642043, 17.714277362), (-0.827939659, 17.747875763), (-0.754699989, 17.771634396), (-0.674747225, 17.789681372), (-0.589228411, 17.806083553), (-0.497482991, 17.818599734), (-0.399695717, 17.827488601), (-0.295622018, 17.833204211), (-0.224282256, 17.834039286), (-0.187582564, 17.834468878)],
                knots=[0, 0, 0, 0, 1.260402266, 2.459371274, 3.627181936, 4.786749125, 5.93865593, 7.087644312, 8.261344208, 9.485713728, 10.136162886, 10.825977872, 11.566646758, 12.35154167, 13.181268117, 14.0701832, 15.007234106, 16, 16, 16, 16], degree=3))
            Line((-0.187582564, 17.834468878), (-1.473439936, 19.449853493))
            Line((-1.473439936, 19.449853493), (-1.085018462, 19.449853493))
            Line((-1.085018462, 19.449853493), (0.20083891, 17.834468878))
            Line((0.20083891, 17.834468878), (0.456047244, 17.834468878))
            Line((0.456047244, 17.834468878), (0.456047244, 19.449853493))
            Line((0.456047244, 19.449853493), (0.770149808, 19.449853493))
            Line((0.770149808, 19.449853493), (0.770149808, 15.949853493))
        make_face()
        with BuildLine():
            Line((0.456047244, 16.308827852), (0.456047244, 17.475494519))
            Line((0.456047244, 17.475494519), (-0.184778077, 17.480402371))
            add(Edge.make_bspline(
                [(-0.184778077, 17.480402371), (-0.21469812, 17.480415616), (-0.272691684, 17.480441287), (-0.356592298, 17.476447408), (-0.434712583, 17.471904439), (-0.506752755, 17.464953926), (-0.572748236, 17.456001693), (-0.632655435, 17.444786189), (-0.686606738, 17.431774923), (-0.749329379, 17.411430804), (-0.820174706, 17.380589004), (-0.895580027, 17.332766113), (-0.96151982, 17.274931374), (-1.016341478, 17.20796185), (-1.060374295, 17.134013656), (-1.090959009, 17.054760347), (-1.111114158, 16.971450639), (-1.113335557, 16.914248523), (-1.114465577, 16.885149968)],
                knots=[0, 0, 0, 0, 1.146399208, 2.222048177, 3.218135709, 4.144938032, 4.994811973, 5.769438708, 6.479732432, 7.119818093, 8.294689872, 9.430121864, 10.527913442, 11.641375077, 12.733452768, 13.811150417, 14.886538365, 16, 16, 16, 16], degree=3))
            add(Edge.make_bspline(
                [(-1.114465577, 16.885149968), (-1.11327834, 16.856997889), (-1.11092567, 16.801210743), (-1.091279923, 16.719723609), (-1.059201529, 16.642240041), (-1.015294441, 16.569826261), (-0.960647361, 16.504580422), (-0.89699582, 16.448925629), (-0.825837681, 16.402689213), (-0.759869456, 16.372182313), (-0.700474821, 16.354232006), (-0.64914328, 16.341201897), (-0.590637341, 16.3320762), (-0.525645612, 16.323682996), (-0.453882588, 16.316575239), (-0.375304538, 16.311857459), (-0.289967646, 16.309037635), (-0.230820731, 16.308899407), (-0.200202756, 16.308827852)],
                knots=[0, 0, 0, 0, 1.100596872, 2.180981401, 3.259506136, 4.371595435, 5.481727359, 6.576991111, 7.667816242, 8.793363246, 9.406619729, 10.09427138, 10.864108636, 11.721733836, 12.6590937, 13.685439239, 14.801845161, 16, 16, 16, 16], degree=3))
            Line((-0.200202756, 16.308827852), (0.456047244, 16.308827852))
        make_face(mode=Mode.SUBTRACT)
    extrude(amount=-CUT_EXTRUDE4_DEPTH, mode=Mode.SUBTRACT)


solid = part.part
